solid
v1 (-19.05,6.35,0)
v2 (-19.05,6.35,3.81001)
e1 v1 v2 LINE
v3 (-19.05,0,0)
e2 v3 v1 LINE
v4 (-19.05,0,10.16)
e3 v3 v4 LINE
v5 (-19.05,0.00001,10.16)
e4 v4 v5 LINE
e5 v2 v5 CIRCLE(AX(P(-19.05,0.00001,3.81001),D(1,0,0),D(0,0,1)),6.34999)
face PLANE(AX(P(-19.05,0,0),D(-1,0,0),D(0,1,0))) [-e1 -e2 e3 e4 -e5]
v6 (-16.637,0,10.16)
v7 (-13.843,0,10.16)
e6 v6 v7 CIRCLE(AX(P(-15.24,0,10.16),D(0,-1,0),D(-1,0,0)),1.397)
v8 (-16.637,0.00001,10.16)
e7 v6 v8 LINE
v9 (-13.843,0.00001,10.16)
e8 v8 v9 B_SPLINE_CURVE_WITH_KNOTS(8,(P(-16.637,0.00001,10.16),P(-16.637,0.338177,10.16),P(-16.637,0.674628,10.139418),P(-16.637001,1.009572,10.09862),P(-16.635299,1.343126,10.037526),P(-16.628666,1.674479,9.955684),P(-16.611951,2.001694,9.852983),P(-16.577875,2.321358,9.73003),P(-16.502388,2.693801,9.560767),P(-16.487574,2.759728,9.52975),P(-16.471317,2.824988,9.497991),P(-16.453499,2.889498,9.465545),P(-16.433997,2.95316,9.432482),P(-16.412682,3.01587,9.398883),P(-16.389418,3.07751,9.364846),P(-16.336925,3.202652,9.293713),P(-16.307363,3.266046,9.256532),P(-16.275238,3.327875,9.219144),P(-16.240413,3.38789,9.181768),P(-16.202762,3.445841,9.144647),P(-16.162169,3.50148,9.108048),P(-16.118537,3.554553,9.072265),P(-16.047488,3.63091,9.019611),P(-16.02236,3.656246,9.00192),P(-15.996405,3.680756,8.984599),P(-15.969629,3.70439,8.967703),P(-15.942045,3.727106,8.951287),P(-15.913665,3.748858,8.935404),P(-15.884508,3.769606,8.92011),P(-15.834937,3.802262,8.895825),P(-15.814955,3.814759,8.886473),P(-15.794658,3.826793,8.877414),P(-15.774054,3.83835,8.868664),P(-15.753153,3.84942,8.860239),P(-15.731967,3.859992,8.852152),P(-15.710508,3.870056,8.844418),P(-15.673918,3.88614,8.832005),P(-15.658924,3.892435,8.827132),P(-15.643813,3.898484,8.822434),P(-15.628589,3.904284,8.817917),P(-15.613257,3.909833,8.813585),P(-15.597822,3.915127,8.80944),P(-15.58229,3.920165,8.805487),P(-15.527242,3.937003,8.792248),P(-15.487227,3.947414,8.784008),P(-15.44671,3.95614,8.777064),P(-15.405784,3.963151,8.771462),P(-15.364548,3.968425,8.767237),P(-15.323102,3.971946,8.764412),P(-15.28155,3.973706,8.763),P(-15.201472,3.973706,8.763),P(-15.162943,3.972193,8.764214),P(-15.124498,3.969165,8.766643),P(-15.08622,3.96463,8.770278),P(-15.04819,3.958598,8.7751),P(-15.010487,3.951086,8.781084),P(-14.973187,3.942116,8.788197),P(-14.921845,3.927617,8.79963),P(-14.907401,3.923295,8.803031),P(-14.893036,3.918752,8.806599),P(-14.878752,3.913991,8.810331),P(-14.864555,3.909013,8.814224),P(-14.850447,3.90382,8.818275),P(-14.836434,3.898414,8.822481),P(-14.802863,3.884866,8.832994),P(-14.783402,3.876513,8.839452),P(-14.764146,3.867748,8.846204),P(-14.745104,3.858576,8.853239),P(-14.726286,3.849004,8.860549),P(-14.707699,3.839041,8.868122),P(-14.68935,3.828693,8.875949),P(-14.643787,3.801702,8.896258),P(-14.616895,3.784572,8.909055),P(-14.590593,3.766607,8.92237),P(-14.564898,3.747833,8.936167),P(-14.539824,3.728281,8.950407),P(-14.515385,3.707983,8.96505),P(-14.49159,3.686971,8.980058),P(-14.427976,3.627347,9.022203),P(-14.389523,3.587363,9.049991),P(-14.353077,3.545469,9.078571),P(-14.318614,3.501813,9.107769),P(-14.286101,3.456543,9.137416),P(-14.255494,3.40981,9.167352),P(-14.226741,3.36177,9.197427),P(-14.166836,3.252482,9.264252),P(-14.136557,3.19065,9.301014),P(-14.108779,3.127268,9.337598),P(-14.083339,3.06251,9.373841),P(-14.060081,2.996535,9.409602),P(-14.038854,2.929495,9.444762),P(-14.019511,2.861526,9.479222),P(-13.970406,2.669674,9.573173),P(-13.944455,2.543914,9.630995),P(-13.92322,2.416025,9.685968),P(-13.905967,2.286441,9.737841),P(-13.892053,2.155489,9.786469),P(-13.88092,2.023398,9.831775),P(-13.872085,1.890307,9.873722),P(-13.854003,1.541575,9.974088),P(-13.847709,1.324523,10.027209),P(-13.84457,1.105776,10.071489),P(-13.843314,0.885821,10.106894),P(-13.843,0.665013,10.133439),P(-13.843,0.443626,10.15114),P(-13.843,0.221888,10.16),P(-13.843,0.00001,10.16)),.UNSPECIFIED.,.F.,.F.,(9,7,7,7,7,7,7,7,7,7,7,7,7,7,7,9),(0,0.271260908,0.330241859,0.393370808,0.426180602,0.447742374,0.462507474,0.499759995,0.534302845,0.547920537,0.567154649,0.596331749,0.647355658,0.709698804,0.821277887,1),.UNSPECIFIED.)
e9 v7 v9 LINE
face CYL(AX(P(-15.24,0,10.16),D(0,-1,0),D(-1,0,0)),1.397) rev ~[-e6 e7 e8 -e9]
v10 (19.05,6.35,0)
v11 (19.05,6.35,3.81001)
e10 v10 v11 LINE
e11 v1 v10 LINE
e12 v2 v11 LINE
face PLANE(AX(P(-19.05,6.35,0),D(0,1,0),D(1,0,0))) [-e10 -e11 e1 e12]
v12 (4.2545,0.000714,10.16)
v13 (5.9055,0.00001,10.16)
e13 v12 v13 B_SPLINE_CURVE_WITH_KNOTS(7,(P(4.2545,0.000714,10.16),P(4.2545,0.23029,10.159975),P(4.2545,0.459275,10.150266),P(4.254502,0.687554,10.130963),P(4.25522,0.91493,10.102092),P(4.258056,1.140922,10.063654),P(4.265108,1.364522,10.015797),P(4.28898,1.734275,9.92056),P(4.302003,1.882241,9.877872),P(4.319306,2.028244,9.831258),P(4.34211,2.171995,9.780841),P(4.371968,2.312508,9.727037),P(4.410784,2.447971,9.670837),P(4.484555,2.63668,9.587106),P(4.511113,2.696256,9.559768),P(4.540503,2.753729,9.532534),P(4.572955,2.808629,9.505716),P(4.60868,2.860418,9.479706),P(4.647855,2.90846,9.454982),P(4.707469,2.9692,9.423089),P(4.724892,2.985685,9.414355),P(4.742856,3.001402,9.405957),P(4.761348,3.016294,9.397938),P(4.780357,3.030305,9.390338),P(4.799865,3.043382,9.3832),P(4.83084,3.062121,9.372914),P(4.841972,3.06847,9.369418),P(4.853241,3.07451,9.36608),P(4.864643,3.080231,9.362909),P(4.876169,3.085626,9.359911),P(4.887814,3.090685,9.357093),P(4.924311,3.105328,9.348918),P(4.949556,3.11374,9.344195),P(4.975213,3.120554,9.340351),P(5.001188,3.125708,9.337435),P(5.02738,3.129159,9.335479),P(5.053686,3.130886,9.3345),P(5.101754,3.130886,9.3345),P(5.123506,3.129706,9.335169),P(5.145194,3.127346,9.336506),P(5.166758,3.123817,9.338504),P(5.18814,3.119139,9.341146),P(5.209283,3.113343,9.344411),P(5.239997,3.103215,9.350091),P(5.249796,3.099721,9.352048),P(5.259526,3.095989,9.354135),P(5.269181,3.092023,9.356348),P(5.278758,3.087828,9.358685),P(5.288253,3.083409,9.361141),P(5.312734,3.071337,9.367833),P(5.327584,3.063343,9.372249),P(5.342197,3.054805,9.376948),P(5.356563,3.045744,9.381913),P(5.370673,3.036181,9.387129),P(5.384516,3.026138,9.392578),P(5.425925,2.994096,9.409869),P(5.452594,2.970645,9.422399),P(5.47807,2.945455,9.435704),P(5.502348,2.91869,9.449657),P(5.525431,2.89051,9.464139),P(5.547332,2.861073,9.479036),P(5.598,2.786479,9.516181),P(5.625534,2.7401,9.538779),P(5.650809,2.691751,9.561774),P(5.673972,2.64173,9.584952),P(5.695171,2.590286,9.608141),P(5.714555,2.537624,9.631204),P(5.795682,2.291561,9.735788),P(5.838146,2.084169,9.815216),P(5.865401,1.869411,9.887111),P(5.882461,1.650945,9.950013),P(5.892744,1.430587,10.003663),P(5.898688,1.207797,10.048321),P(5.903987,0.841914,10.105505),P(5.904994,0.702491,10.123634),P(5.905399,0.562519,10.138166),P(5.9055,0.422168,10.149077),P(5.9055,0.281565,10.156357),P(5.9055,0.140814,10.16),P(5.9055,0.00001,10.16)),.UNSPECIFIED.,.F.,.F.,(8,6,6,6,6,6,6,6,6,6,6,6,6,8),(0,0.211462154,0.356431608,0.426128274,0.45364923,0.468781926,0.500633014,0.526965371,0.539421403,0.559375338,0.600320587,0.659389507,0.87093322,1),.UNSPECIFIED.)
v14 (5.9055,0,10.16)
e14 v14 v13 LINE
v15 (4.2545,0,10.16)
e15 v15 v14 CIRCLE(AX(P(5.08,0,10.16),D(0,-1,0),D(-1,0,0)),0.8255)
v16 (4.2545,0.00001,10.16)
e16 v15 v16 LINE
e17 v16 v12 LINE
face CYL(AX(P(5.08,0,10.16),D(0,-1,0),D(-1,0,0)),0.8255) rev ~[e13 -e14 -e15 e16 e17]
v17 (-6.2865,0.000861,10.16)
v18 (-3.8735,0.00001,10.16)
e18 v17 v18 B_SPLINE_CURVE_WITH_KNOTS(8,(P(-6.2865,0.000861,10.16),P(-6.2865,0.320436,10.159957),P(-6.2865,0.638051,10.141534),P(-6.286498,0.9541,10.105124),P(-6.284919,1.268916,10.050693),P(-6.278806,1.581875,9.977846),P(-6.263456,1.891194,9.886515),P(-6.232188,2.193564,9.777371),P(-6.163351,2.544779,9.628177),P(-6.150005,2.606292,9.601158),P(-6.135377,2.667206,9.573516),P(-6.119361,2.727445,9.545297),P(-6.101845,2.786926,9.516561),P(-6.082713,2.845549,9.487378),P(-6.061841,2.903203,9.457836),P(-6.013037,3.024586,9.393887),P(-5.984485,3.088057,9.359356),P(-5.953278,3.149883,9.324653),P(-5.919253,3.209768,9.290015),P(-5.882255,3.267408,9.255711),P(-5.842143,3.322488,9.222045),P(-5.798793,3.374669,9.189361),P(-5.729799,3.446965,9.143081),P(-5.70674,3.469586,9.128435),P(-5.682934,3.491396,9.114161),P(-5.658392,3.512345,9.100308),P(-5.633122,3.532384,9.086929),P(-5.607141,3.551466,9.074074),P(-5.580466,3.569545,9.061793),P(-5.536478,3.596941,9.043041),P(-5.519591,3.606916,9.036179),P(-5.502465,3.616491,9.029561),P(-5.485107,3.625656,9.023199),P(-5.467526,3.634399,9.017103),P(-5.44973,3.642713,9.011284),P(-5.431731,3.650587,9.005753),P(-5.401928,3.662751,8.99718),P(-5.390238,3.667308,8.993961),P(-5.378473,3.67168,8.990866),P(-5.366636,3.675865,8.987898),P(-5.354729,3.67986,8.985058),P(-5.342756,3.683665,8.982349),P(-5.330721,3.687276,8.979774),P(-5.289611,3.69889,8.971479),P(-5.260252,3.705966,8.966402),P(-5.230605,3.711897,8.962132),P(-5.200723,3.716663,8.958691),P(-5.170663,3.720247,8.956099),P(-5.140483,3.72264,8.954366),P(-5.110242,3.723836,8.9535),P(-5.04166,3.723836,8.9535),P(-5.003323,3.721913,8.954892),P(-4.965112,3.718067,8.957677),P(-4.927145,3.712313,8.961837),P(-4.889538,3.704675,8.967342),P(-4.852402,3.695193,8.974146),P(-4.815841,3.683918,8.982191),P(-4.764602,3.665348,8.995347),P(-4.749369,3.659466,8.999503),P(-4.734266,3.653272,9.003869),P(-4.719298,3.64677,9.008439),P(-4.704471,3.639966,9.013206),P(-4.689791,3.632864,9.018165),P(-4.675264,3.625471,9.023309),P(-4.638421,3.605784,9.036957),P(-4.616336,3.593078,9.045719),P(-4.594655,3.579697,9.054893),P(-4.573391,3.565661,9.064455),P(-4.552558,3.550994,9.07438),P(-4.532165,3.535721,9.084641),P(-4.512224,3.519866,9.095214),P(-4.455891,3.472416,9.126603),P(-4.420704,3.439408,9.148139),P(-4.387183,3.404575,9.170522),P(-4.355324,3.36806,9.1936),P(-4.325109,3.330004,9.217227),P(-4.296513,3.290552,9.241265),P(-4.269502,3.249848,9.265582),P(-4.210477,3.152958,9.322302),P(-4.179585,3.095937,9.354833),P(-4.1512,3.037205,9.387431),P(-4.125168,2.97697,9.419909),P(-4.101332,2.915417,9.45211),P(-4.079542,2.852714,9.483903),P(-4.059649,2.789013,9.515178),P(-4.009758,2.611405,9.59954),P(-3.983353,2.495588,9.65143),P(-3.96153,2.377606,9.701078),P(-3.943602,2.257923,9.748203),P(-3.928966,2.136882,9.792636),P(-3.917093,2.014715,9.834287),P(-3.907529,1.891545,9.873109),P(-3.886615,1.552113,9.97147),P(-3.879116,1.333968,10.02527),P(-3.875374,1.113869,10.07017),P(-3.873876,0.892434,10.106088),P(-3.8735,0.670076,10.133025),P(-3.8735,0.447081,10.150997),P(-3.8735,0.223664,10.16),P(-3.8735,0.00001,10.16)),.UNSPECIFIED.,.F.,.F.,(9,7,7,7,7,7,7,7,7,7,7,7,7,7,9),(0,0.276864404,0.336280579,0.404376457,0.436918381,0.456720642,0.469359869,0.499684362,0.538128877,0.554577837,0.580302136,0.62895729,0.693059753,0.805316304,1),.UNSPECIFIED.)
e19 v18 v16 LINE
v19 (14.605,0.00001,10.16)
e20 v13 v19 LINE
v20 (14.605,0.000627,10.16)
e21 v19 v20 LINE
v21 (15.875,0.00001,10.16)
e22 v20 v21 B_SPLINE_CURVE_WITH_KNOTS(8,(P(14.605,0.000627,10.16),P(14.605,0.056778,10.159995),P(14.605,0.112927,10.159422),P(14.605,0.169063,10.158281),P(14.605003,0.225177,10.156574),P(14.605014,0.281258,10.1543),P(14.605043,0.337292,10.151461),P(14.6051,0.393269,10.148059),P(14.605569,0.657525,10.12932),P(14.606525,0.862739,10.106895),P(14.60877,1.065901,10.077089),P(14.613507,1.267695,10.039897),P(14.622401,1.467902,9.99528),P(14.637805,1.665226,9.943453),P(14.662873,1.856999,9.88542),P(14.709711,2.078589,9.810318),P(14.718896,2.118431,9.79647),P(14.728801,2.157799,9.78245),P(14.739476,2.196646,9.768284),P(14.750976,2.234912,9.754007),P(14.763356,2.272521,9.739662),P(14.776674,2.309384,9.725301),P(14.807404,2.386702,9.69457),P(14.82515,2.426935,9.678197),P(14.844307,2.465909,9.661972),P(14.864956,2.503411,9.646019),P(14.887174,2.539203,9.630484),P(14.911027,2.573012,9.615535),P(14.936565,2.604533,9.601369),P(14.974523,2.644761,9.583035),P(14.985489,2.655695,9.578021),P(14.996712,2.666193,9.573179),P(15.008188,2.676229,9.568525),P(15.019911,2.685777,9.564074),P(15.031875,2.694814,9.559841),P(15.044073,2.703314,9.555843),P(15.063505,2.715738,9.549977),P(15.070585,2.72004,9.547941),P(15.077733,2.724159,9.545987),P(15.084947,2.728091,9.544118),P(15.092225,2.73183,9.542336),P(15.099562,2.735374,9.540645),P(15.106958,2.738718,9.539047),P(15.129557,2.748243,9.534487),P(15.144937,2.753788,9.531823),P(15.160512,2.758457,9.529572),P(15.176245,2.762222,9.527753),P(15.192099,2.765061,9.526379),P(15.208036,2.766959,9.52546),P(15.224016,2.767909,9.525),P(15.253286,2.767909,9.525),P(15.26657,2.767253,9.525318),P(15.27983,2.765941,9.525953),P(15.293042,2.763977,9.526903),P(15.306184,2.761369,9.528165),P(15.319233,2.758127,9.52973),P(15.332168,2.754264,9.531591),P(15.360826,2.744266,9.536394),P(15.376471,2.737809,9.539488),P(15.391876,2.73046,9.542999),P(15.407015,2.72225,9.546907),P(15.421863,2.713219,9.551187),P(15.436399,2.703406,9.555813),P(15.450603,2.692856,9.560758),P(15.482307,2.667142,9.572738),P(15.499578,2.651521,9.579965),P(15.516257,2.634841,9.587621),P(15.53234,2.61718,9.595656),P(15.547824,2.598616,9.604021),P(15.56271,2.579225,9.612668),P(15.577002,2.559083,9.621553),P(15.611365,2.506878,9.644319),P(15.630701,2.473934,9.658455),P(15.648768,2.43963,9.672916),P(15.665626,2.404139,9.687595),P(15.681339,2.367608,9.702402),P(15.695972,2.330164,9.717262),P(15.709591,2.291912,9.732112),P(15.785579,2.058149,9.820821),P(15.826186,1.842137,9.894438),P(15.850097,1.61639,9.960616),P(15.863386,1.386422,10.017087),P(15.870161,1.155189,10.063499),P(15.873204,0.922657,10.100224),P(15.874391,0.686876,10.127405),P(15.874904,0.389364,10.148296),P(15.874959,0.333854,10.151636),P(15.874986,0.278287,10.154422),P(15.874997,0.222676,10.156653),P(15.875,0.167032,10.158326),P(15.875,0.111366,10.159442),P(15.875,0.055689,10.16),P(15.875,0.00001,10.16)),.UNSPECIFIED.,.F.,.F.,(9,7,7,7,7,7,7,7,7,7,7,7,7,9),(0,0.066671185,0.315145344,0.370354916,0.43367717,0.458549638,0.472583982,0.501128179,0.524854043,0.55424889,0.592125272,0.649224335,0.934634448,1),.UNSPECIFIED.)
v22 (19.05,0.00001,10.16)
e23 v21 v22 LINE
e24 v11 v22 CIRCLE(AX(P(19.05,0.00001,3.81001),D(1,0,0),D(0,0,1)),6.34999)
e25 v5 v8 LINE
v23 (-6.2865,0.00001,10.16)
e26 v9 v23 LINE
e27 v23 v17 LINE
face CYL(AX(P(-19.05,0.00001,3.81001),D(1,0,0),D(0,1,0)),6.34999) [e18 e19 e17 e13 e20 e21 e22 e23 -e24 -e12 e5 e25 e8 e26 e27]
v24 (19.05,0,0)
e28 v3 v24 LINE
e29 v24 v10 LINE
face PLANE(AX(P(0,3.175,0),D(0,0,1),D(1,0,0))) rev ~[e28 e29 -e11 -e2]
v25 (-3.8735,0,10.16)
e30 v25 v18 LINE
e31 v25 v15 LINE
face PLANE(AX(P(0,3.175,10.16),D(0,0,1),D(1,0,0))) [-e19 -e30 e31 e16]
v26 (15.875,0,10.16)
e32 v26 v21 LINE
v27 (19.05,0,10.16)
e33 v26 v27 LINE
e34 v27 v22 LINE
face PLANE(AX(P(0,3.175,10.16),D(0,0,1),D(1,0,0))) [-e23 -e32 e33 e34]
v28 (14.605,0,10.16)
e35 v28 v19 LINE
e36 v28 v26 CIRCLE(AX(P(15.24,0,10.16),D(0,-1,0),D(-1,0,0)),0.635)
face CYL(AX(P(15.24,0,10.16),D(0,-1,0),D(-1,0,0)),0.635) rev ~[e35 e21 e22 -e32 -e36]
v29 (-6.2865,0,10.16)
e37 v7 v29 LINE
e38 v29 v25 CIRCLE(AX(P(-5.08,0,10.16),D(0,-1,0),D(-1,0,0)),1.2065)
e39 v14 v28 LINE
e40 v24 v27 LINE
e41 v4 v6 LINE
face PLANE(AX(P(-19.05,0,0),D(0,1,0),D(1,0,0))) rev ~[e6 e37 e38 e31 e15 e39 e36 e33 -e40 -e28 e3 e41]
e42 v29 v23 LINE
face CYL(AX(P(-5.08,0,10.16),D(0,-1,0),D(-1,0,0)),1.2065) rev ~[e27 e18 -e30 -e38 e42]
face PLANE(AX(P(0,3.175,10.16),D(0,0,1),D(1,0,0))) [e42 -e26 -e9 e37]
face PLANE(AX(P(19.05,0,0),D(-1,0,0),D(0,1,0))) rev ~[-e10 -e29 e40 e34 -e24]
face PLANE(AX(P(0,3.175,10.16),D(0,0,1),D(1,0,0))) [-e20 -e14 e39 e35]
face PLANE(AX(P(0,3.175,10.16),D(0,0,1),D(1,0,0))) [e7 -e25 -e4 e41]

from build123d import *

# Parameters (mm, degrees)
F0_W     = 38.1
F0_H     = 6.35
F1_DEPTH = 10.16
F2_R     = 6.34999
F4_DEPTH = 25.4


# Not quite as in the source:
# - a fillet or chamfer is up to 0.001 mm smaller than in the source, because OpenCascade refuses the exact size


with BuildPart() as f1:
    # F0 (on Top) → F1 (new body)
    with BuildSketch(Plane.XY):
        with Locations((0, 3.175)):
            Rectangle(F0_W, F0_H)
    extrude(amount=F1_DEPTH)

    # F2 (radius 6.35 in the source; OpenCascade refuses exactly that, so slightly less here)
    f2_edges = [f1.edges().sort_by_distance(p)[0] for p in [
        (0, 6.35, 10.16),
    ]]
    fillet(f2_edges, radius=F2_R)

    # F3 (on face) → F4 (cut)
    with BuildSketch(Plane.XZ):
        with BuildLine():
            ThreePointArc((-16.637, 10.16), (-15.24, 8.763), (-13.843, 10.16))
            Line((-13.843, 10.16), (-16.637, 10.16))
        make_face()
        with BuildLine():
            Line((-3.8735, 10.16), (-6.2865, 10.16))
            ThreePointArc((-6.2865, 10.16), (-5.08, 8.9535), (-3.8735, 10.16))
        make_face()
        with BuildLine():
            Line((5.9055, 10.16), (4.2545, 10.16))
            ThreePointArc((4.2545, 10.16), (5.08, 9.3345), (5.9055, 10.16))
        make_face()
        with BuildLine():
            Line((15.875, 10.16), (14.605, 10.16))
            ThreePointArc((14.605, 10.16), (15.24, 9.525), (15.875, 10.16))
        make_face()
    extrude(amount=-F4_DEPTH, mode=Mode.SUBTRACT)


solid = f1.part
